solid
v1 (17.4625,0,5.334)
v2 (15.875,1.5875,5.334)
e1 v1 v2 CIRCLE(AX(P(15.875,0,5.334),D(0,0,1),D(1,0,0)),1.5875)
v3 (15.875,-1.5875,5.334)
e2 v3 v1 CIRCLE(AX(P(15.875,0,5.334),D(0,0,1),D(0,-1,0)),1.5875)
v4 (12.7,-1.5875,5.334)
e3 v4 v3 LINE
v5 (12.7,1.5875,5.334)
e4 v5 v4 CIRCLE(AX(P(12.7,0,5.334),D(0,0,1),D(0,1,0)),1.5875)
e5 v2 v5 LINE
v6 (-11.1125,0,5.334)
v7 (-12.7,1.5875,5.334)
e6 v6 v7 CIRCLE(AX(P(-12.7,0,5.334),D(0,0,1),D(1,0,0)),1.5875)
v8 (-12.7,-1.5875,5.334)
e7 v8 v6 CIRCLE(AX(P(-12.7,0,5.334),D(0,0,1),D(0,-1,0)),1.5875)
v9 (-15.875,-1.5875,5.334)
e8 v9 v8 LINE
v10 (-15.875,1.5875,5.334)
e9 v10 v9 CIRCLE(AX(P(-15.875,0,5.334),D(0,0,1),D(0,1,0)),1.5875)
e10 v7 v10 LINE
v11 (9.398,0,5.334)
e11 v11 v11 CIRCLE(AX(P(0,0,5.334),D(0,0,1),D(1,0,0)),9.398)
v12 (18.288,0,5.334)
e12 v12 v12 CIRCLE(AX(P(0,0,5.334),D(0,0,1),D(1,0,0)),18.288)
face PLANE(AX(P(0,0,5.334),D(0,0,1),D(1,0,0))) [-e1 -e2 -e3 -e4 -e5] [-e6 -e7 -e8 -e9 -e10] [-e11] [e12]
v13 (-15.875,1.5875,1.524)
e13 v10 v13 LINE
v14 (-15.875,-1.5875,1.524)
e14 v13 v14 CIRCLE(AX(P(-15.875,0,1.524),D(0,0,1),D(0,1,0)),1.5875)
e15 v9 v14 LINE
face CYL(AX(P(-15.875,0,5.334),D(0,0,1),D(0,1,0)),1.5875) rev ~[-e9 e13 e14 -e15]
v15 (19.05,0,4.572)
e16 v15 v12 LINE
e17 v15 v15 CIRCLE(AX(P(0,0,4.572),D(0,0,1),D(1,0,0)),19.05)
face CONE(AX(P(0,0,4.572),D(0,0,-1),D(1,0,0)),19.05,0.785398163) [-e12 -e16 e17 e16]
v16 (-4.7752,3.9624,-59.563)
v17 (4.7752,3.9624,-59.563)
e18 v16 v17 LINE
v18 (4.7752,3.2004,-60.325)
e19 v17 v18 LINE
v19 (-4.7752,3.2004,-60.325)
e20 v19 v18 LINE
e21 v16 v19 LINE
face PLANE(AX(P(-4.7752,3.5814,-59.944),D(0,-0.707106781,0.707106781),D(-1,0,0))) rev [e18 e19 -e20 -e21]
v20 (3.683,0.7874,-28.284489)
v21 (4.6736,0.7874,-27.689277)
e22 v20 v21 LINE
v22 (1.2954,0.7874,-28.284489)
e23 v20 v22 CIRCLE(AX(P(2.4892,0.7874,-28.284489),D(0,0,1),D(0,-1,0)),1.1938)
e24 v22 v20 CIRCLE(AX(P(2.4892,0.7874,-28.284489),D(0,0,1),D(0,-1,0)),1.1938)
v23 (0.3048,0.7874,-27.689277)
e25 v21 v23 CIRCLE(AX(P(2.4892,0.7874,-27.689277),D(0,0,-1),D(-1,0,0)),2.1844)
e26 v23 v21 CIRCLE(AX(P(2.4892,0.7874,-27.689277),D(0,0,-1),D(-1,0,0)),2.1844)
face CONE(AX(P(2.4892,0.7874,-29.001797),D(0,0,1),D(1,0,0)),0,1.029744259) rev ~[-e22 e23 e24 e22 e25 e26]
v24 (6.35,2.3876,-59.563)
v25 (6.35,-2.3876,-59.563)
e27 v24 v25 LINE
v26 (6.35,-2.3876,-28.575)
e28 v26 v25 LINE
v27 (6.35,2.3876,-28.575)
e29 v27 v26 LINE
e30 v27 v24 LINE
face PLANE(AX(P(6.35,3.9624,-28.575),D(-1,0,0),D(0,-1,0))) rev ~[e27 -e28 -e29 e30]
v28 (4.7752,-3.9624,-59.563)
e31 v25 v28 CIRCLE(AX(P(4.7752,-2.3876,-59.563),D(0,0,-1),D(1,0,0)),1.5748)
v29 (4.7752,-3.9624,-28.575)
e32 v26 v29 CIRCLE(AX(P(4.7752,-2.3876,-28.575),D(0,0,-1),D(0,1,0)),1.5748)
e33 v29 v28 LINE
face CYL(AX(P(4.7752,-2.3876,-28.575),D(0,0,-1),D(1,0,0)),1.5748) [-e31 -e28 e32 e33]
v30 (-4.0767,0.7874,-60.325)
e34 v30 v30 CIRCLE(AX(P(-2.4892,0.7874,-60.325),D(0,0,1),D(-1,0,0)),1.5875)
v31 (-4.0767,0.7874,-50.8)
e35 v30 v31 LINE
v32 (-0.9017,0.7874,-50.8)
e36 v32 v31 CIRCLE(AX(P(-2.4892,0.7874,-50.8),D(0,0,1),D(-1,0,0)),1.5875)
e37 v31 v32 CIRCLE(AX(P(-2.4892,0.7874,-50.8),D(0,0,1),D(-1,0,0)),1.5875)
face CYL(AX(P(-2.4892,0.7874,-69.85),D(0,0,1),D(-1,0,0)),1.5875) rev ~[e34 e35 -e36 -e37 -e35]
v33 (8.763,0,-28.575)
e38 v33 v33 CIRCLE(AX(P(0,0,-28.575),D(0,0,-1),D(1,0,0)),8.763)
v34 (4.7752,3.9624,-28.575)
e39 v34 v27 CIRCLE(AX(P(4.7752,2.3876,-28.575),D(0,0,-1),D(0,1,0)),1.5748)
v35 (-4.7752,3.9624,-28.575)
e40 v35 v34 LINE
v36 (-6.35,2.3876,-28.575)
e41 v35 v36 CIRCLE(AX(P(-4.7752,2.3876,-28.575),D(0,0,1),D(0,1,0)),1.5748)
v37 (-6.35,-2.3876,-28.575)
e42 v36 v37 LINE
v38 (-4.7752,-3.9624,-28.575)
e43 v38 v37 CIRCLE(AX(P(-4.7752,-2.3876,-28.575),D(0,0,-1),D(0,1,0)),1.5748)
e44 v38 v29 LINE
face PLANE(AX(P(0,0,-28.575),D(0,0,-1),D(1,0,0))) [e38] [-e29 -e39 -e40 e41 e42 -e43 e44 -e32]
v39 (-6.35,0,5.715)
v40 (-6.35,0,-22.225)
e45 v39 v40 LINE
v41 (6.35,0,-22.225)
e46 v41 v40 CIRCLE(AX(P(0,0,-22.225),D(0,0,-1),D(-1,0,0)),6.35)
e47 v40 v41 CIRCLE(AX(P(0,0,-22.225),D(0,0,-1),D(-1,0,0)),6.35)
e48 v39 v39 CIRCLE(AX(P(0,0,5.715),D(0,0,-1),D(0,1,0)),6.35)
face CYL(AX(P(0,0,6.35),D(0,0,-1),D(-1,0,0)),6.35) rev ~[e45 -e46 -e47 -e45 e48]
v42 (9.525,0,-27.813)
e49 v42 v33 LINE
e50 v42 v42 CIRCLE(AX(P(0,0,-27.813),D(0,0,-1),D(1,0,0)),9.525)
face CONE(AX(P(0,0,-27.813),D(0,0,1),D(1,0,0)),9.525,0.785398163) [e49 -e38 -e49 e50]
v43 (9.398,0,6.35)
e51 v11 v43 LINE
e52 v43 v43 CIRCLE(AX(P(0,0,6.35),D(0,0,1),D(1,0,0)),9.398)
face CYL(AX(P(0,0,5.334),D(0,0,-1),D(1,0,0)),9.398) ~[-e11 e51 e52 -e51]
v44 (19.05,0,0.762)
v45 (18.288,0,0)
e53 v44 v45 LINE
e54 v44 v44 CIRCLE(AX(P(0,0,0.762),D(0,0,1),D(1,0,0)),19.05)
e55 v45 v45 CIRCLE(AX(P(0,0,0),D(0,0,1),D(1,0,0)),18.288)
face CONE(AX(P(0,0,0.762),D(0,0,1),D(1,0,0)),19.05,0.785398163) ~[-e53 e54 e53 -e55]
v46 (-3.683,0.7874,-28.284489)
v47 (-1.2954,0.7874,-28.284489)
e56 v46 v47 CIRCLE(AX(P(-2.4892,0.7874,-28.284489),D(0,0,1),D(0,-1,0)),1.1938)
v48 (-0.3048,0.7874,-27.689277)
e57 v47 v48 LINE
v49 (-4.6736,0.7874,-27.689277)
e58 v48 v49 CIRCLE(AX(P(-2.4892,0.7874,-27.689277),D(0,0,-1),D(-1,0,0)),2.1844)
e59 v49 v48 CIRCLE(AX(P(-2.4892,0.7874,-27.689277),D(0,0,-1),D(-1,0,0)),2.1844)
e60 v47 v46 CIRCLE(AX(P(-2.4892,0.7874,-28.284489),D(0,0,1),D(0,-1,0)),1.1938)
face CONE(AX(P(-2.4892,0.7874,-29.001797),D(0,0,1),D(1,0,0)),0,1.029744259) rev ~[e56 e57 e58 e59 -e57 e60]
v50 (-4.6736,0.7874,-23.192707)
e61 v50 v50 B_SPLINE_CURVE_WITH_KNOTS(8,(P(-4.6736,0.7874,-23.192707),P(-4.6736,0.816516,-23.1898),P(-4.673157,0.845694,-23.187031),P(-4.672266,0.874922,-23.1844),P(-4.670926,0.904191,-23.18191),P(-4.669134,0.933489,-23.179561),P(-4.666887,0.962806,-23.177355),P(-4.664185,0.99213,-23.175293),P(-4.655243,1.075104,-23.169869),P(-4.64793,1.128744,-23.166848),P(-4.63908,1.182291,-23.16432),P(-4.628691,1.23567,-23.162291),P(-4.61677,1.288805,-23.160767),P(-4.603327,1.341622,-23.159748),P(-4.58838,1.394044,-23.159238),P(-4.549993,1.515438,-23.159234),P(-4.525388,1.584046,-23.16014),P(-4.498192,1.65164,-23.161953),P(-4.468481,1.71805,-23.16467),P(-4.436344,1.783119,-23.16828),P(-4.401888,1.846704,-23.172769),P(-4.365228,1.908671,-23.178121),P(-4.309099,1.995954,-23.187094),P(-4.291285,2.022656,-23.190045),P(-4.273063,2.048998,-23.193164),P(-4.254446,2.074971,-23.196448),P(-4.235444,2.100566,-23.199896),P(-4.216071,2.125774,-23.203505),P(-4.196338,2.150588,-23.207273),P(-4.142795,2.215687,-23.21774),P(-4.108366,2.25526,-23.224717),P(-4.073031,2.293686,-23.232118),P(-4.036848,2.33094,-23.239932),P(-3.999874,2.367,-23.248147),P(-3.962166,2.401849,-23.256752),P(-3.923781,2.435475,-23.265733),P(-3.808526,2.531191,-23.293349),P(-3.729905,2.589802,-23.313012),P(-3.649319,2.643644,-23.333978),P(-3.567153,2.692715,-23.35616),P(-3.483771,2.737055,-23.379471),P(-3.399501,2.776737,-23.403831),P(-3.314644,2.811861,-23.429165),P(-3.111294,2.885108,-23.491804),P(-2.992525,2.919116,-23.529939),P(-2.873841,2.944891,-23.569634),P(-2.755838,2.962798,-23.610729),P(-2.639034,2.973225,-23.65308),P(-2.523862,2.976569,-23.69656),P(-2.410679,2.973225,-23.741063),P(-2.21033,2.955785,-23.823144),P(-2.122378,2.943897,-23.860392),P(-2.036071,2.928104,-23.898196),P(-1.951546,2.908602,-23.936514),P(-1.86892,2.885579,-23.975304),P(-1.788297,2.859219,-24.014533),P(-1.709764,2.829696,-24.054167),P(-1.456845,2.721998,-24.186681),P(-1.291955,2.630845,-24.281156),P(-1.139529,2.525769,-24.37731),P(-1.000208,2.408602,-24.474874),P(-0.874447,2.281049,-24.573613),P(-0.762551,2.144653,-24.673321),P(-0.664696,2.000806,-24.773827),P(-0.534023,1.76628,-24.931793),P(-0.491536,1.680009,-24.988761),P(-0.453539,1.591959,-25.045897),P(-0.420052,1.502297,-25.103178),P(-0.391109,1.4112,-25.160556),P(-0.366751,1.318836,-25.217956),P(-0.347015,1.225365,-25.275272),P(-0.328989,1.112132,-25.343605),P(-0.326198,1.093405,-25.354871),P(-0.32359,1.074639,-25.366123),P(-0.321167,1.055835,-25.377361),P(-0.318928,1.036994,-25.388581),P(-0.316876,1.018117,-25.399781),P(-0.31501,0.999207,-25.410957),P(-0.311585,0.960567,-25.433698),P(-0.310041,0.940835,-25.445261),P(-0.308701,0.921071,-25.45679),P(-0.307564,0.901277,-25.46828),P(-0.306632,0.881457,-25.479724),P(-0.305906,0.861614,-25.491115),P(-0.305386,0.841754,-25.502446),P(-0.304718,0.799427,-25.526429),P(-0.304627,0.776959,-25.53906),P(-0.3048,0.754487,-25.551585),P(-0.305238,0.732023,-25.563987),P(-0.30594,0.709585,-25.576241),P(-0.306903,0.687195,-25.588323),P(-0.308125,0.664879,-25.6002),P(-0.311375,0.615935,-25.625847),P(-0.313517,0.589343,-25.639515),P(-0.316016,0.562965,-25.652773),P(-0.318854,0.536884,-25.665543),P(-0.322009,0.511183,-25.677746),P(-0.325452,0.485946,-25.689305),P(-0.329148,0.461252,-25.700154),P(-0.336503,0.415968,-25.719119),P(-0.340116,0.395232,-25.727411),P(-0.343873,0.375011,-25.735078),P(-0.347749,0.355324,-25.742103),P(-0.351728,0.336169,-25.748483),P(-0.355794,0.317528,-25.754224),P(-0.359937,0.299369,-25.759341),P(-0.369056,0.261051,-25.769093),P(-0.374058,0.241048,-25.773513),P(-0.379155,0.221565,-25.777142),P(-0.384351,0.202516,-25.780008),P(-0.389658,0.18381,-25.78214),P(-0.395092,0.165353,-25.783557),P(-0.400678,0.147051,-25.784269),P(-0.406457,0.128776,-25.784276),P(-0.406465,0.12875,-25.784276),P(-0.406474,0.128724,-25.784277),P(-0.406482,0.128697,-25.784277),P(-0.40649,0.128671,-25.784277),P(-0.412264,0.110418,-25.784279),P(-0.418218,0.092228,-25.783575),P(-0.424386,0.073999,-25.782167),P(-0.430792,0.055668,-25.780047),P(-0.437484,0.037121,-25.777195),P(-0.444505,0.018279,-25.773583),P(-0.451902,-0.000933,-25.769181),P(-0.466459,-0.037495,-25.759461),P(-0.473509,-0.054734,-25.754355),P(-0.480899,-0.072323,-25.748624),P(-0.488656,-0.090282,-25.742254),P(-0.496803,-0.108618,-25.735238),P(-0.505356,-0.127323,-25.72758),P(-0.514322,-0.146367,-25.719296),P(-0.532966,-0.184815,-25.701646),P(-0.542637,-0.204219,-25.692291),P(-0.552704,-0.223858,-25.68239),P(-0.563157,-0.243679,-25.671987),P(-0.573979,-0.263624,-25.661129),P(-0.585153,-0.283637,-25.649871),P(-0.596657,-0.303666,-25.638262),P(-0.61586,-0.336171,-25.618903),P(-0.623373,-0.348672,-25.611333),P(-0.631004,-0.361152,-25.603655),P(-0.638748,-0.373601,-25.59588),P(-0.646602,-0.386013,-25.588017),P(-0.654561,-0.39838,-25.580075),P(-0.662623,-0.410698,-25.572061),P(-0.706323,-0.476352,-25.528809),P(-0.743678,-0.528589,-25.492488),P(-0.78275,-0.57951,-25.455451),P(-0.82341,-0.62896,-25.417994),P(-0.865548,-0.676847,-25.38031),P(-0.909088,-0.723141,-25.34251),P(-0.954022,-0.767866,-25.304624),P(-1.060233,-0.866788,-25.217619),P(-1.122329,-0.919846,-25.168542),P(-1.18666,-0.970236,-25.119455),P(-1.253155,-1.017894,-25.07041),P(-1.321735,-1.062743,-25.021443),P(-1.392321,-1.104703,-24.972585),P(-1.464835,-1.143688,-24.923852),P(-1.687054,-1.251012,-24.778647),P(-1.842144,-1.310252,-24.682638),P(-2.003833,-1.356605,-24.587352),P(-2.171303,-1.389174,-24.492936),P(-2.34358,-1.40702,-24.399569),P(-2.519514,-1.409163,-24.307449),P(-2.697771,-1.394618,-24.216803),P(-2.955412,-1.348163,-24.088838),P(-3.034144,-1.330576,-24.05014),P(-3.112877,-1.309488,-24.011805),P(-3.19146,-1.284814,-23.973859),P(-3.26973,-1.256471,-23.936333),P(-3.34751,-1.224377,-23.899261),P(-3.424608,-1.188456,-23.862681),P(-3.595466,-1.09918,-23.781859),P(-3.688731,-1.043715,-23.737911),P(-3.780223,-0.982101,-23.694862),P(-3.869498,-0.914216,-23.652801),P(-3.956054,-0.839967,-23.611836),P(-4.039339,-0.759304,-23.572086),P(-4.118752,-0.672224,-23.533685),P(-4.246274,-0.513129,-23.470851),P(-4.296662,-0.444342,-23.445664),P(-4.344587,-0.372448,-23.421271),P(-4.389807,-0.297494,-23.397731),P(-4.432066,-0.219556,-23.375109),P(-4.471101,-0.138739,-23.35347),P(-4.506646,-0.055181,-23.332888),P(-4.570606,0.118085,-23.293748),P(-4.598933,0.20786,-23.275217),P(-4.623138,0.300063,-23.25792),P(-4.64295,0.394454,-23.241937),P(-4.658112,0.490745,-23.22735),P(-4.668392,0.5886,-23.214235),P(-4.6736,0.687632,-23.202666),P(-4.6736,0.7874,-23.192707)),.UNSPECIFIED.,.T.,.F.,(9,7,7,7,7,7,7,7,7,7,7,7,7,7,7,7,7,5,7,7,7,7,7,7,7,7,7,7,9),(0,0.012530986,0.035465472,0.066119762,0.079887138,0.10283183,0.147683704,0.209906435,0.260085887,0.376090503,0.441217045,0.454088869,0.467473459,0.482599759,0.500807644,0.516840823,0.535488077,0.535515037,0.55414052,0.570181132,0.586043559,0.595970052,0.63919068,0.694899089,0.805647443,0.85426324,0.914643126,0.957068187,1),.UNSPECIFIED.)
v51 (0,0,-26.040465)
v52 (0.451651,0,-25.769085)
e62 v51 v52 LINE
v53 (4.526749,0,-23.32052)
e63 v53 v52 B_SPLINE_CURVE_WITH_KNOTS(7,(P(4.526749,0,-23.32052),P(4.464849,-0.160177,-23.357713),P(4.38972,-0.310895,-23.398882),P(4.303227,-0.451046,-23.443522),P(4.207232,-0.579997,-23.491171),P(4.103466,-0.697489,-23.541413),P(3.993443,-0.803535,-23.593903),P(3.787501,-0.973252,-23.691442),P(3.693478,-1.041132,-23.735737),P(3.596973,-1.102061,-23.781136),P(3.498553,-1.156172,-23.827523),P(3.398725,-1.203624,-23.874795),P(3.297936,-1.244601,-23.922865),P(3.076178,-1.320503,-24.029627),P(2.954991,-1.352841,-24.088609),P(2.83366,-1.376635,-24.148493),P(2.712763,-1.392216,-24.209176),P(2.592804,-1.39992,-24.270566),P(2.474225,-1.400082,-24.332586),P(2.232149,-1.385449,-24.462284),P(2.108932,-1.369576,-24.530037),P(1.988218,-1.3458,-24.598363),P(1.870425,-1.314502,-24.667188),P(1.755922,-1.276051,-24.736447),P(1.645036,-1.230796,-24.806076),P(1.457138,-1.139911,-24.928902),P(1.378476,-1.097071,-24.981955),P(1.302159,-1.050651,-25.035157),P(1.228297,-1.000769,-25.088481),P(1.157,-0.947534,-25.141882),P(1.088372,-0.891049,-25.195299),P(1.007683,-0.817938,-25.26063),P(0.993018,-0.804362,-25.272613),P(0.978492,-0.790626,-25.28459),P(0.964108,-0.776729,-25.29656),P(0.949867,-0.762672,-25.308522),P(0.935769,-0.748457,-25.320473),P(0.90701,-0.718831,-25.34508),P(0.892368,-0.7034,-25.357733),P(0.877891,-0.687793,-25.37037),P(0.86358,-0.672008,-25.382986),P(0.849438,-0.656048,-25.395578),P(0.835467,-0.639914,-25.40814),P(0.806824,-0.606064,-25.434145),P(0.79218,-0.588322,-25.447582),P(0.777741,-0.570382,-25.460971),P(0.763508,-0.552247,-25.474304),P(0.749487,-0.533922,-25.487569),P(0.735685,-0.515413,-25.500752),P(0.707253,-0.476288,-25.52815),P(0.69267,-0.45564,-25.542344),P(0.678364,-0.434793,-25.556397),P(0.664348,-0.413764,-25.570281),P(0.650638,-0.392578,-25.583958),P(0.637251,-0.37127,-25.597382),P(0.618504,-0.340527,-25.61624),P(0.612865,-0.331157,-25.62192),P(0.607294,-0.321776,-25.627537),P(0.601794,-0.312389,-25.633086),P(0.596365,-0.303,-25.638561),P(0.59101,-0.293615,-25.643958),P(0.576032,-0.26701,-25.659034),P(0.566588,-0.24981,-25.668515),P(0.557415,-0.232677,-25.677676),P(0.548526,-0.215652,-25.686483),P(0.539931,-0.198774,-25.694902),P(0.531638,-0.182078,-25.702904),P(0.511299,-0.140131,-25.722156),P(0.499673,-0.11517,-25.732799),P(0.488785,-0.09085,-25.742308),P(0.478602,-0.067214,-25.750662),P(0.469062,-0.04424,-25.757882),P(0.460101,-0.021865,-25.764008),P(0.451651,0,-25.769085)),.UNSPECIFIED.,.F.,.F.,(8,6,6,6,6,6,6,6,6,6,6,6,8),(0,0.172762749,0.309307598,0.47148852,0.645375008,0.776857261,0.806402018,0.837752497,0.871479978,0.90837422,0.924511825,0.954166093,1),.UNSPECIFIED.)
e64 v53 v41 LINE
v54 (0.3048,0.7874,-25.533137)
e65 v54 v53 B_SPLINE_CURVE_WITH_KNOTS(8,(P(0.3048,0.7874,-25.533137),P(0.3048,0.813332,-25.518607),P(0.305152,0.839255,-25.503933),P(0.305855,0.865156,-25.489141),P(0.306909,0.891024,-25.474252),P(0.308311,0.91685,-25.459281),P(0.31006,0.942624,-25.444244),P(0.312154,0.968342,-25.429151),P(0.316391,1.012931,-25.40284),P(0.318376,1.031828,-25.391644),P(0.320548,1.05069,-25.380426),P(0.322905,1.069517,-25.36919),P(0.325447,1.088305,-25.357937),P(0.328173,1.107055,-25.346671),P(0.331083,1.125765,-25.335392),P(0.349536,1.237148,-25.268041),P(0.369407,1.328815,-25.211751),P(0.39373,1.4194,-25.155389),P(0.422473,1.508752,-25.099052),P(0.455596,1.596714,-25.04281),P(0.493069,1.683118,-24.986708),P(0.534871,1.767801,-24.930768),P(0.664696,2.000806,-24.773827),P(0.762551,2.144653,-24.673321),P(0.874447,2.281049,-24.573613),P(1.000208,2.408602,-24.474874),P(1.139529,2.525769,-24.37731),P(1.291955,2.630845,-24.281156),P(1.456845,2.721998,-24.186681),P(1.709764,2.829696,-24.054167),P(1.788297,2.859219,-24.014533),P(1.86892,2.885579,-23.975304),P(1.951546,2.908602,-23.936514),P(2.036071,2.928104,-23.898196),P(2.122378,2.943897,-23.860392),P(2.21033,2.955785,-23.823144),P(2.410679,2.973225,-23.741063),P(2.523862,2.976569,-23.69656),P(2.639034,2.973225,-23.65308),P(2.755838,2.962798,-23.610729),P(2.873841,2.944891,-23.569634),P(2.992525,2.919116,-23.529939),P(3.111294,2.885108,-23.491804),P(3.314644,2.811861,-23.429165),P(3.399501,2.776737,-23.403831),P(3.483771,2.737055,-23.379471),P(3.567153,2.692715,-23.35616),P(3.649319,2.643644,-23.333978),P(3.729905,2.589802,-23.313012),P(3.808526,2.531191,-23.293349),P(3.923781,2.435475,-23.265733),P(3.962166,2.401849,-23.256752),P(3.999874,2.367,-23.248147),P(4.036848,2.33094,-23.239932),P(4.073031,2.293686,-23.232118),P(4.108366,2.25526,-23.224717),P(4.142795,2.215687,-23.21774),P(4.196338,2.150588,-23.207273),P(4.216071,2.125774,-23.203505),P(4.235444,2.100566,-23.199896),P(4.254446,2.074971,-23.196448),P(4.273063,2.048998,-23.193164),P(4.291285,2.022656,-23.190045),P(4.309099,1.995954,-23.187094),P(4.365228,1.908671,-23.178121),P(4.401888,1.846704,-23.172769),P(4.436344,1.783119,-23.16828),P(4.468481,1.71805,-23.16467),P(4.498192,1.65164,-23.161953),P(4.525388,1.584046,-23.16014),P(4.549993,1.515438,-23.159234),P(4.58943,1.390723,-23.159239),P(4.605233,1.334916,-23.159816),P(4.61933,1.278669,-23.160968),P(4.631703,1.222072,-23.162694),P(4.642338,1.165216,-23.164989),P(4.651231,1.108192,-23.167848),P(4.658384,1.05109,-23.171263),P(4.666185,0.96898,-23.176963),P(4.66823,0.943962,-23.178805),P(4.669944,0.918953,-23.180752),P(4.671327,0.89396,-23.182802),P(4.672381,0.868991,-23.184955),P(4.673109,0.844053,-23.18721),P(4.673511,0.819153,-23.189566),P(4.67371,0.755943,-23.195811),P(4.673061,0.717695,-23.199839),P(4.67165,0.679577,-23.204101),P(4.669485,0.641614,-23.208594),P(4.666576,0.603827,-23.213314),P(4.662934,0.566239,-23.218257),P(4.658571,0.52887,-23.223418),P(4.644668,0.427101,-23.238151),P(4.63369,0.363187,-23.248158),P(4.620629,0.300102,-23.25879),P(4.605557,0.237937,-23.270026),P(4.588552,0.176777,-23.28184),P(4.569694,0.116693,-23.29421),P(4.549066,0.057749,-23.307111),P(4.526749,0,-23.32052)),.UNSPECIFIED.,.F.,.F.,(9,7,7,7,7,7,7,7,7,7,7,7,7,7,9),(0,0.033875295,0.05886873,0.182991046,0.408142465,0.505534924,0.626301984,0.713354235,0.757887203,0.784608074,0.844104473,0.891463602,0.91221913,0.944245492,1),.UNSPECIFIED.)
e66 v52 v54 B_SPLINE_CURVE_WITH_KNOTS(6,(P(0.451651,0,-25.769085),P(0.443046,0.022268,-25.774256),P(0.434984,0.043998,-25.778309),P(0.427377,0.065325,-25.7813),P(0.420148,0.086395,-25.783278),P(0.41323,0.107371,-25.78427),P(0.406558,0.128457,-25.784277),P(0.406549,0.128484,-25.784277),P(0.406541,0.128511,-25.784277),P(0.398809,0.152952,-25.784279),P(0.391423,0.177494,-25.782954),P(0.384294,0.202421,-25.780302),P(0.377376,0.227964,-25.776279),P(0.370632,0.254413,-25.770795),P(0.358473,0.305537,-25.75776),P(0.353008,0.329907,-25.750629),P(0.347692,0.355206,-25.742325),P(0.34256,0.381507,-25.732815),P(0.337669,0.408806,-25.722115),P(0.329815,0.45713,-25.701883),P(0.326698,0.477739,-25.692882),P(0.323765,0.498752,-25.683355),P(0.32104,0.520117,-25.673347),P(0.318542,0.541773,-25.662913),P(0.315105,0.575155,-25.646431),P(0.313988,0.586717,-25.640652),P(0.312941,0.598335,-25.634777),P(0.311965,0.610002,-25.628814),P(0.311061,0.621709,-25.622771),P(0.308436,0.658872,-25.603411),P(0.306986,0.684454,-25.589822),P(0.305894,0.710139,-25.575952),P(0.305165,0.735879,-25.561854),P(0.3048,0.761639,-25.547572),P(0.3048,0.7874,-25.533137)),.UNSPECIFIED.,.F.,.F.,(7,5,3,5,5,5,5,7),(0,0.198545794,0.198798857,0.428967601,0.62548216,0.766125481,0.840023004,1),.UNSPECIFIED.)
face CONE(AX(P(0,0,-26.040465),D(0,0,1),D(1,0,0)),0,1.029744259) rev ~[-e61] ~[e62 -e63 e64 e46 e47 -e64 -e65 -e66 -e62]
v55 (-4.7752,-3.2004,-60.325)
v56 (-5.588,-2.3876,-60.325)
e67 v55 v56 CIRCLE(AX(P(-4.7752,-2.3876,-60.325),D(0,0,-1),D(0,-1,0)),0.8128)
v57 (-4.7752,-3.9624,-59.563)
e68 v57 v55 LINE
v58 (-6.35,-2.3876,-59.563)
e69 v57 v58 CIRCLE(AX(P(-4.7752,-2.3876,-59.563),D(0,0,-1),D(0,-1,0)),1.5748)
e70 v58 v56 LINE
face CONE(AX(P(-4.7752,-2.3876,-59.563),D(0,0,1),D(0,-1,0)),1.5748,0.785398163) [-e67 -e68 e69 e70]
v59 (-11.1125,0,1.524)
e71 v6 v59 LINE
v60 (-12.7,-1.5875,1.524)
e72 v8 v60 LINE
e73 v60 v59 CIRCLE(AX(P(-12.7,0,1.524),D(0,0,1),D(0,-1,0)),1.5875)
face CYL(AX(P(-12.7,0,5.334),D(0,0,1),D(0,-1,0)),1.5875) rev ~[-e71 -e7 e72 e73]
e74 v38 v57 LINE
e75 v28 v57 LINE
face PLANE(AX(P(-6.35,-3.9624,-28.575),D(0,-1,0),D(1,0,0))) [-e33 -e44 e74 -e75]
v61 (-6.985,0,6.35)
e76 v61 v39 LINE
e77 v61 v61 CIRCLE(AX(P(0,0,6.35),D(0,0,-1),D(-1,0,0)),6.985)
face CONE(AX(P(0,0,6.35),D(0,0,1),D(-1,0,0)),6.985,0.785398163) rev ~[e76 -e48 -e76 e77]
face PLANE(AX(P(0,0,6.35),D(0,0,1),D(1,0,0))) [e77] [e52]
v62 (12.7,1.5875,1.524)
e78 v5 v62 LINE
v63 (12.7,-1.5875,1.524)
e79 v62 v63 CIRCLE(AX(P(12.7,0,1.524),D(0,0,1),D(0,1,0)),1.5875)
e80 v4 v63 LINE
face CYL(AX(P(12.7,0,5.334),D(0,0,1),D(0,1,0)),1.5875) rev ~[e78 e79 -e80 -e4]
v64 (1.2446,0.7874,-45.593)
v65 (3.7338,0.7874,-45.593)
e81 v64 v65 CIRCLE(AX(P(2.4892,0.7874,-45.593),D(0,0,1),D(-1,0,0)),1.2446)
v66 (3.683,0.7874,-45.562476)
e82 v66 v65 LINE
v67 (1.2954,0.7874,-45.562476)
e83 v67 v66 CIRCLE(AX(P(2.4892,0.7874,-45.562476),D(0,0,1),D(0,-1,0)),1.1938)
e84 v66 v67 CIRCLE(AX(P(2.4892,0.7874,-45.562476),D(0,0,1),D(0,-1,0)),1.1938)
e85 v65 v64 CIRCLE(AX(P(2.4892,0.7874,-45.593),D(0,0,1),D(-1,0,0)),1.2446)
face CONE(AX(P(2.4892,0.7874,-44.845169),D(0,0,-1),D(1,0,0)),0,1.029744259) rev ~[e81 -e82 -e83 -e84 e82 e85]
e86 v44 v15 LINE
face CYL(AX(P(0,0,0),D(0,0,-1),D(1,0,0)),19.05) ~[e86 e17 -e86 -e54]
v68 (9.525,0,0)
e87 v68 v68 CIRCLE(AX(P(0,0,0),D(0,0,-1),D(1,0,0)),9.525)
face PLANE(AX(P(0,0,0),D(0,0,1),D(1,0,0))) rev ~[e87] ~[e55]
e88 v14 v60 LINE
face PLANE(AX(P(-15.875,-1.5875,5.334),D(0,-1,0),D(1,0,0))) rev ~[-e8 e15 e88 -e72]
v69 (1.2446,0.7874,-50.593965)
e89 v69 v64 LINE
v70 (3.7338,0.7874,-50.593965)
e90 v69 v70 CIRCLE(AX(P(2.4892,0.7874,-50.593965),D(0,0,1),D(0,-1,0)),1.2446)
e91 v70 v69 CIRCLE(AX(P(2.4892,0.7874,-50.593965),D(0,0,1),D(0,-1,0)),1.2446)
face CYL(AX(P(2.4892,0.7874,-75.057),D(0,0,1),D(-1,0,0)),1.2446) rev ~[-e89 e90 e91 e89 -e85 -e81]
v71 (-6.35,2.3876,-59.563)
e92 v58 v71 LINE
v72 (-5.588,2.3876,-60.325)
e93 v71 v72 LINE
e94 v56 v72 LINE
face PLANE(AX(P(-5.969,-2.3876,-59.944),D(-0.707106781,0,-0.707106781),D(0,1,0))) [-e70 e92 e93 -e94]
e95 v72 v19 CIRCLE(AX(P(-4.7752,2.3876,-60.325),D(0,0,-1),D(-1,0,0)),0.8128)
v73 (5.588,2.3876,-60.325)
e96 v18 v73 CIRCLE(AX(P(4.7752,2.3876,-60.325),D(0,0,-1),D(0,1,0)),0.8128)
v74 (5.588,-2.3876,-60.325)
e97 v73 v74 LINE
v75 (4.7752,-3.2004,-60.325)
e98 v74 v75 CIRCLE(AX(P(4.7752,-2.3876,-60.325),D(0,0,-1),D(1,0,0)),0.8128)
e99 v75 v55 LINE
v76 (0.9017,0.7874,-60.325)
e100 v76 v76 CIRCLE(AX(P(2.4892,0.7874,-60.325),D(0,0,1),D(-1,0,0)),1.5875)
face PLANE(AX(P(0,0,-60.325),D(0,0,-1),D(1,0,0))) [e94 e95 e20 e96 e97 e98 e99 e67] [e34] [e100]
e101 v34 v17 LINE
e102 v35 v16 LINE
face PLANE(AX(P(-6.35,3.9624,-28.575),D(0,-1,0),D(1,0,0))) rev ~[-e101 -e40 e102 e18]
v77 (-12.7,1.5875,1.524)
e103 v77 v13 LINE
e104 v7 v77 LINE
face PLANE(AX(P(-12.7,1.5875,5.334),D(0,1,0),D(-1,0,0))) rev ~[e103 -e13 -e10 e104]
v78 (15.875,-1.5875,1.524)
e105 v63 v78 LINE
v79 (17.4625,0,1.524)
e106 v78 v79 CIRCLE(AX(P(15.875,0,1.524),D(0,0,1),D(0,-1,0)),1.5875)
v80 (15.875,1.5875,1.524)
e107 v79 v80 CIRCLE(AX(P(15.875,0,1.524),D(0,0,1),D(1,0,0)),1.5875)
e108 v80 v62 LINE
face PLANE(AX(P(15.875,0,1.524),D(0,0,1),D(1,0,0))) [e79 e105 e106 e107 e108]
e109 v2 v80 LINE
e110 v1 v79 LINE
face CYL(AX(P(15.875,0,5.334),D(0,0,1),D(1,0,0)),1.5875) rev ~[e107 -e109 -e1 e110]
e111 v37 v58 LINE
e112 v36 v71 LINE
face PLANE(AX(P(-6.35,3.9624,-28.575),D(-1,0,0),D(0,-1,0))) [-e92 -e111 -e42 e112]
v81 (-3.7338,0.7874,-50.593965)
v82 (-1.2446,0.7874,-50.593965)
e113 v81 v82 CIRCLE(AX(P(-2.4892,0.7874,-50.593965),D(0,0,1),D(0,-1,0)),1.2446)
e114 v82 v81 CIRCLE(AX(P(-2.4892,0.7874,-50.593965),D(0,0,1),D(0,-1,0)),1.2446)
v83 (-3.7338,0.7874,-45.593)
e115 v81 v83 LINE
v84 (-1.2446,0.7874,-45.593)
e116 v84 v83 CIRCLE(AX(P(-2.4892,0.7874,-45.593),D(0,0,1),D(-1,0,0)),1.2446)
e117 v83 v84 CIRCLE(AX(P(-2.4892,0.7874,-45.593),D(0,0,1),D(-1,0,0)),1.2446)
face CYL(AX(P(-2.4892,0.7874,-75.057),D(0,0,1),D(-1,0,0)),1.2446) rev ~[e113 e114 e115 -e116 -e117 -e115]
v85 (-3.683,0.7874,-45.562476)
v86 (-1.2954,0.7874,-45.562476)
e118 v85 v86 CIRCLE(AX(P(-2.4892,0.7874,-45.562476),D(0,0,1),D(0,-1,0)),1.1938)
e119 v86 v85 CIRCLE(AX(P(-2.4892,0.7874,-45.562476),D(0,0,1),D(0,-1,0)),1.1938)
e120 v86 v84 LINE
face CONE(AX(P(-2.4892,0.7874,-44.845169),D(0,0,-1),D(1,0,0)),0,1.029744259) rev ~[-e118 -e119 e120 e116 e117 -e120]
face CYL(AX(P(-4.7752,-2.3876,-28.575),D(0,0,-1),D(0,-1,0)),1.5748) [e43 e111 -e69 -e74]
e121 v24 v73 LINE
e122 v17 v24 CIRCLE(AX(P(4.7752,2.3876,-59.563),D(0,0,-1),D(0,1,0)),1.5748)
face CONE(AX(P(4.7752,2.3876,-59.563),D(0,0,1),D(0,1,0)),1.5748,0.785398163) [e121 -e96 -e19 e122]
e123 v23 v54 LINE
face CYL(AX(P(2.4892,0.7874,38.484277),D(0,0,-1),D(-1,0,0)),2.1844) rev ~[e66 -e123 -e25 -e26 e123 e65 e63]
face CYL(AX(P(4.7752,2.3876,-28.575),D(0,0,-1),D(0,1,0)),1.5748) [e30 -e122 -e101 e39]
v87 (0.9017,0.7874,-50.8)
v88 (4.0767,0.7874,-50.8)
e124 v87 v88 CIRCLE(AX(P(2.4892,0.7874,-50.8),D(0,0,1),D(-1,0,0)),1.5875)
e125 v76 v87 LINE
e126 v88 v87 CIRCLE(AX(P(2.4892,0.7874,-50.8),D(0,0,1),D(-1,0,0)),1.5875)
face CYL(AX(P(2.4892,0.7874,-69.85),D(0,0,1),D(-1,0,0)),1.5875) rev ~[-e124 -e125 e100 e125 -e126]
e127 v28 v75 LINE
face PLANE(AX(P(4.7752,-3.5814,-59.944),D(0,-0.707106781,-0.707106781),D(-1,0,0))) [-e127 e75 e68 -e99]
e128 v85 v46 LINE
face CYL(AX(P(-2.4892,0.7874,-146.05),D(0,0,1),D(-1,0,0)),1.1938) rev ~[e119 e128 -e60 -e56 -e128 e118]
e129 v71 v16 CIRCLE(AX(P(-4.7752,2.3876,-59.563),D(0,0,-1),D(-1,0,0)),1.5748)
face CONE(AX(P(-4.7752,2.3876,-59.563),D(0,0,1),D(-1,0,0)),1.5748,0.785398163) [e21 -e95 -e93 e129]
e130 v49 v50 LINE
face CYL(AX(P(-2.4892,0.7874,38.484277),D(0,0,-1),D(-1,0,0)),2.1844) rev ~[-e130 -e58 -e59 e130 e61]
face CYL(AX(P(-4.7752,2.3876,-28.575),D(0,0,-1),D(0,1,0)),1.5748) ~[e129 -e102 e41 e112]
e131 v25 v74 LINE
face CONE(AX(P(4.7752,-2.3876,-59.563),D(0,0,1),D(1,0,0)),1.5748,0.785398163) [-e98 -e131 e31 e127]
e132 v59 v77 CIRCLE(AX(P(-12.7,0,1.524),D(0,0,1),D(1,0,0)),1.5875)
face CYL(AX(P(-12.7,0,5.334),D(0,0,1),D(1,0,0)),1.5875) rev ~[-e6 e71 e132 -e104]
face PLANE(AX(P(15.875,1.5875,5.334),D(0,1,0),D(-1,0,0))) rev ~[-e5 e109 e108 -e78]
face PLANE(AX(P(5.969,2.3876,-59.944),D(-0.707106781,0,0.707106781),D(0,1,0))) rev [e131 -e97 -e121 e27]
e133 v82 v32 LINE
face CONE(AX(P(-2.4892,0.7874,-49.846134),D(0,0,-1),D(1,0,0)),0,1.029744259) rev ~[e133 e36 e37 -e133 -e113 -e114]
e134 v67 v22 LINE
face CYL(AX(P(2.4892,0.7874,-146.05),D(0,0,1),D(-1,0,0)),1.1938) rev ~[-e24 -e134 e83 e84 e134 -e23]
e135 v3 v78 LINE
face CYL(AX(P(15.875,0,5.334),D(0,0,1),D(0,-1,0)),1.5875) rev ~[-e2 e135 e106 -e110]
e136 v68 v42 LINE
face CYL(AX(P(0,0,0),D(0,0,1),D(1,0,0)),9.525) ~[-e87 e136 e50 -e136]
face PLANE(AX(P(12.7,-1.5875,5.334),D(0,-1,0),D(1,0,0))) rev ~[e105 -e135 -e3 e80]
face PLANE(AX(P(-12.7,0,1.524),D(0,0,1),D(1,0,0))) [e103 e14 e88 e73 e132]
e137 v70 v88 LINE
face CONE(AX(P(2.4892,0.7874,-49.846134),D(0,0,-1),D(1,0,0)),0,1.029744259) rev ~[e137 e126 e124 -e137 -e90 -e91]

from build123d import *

# Parameters (mm, degrees)
F0_R           = 19.05
F1_DEPTH       = 5.334
F2_R           = 9.398
F3_DEPTH       = 1.016
F4_R           = 9.525
F5_DEPTH       = 28.575
F6_W           = 12.7
F6_H           = 7.9248
F7_DEPTH       = 31.75
F9_D           = 12.7
F9_DEPTH       = 28.575
F9_CSINK_D     = 13.97
F9_CSINK_ANGLE = 90
F9_TIP         = 3.8154649308
F10_SIZE       = 0.762
F12_D          = 2.3876
F14_D          = 2.4892
F14_DEPTH      = 14.732
F14_TIP        = 0.7478311264
F16_D          = 3.175
F16_DEPTH      = 9.525
F16_TIP        = 0.9538662327
F18_D          = 4.3688
F18_DEPTH      = 1.905
F18_START      = 32.1342766
F18_TIP        = 1.3125199362
F20_DEPTH      = 3.81
F21_R          = 1.5748
F22_SIZE       = 0.762


# Not quite as in the source:
# - a length typed as a fraction of an inch, garbled in the dataset ("3 / 203.2 mm" for 3/8 in), is restored


with BuildPart() as f1:
    # F0 (on Top) → F1 (new body)
    with BuildSketch(Plane.XY):
        Circle(F0_R)
    extrude(amount=F1_DEPTH)

    # F2 (on face) → F3 (join)
    with BuildSketch(Plane.XY.offset(5.334)):
        Circle(F2_R)
    extrude(amount=F3_DEPTH)

    # F4 (on face) → F5 (join)
    with BuildSketch(Plane(origin=(0, 0, 0), x_dir=(1, 0, 0), z_dir=(0, 0, -1))):
        Circle(F4_R)
    extrude(amount=F5_DEPTH)

    # F6 (on face) → F7 (join)
    with BuildSketch(Plane(origin=(0, 0, -28.575), x_dir=(1, 0, 0), z_dir=(0, 0, -1))):
        Rectangle(F6_W, F6_H)
    extrude(amount=F7_DEPTH)

    # F9
    with Locations(Plane.XY.offset(6.35)):
        with Locations((0, 0)):
            CounterSinkHole(F9_D / 2, F9_CSINK_D / 2, depth=F9_DEPTH, counter_sink_angle=F9_CSINK_ANGLE)
            with Locations((0, 0, -(F9_DEPTH + F9_TIP / 2))):  # 118° drill point
                Cone(0, F9_D / 2, F9_TIP, mode=Mode.SUBTRACT)

    # F10
    f10_edges = [f1.edges().sort_by_distance(p)[0] for p in [
        (-9.525, 0, -28.575),
        (-19.05, 0, 0),
        (-19.05, 0, 5.334),
    ]]
    chamfer(f10_edges, length=F10_SIZE)

    # F12 (through all)
    with Locations(Plane(origin=(0, 0, -60.325), x_dir=(1, 0, 0), z_dir=(0, 0, -1))):
        with Locations((2.4892, -0.7874), (-2.4892, -0.7874)):
            Hole(F12_D / 2)

    # F14
    with Locations(Plane(origin=(0, 0, -60.325), x_dir=(1, 0, 0), z_dir=(0, 0, -1))):
        with Locations((2.4892, -0.7874), (-2.4892, -0.7874)):
            Hole(F14_D / 2, depth=F14_DEPTH)
            with Locations((0, 0, -(F14_DEPTH + F14_TIP / 2))):  # 118° drill point
                Cone(0, F14_D / 2, F14_TIP, mode=Mode.SUBTRACT)

    # F16
    with Locations(Plane(origin=(0, 0, -60.325), x_dir=(1, 0, 0), z_dir=(0, 0, -1))):
        with Locations((2.4892, -0.7874), (-2.4892, -0.7874)):
            Hole(F16_D / 2, depth=F16_DEPTH)
            with Locations((0, 0, -(F16_DEPTH + F16_TIP / 2))):  # 118° drill point
                Cone(0, F16_D / 2, F16_TIP, mode=Mode.SUBTRACT)

    # F18
    # its depths count from where the whole tool has entered the part; down to there all is cleared
    with Locations(Plane.XY.offset(6.35)):
        with Locations((2.4892, 0.7874), (-2.4892, 0.7874)):
            Hole(F18_D / 2, depth=F18_START)
    with Locations(Plane.XY.offset(6.35).offset(-F18_START)):
        with Locations((2.4892, 0.7874), (-2.4892, 0.7874)):
            Hole(F18_D / 2, depth=F18_DEPTH)
            with Locations((0, 0, -(F18_DEPTH + F18_TIP / 2))):  # 118° drill point
                Cone(0, F18_D / 2, F18_TIP, mode=Mode.SUBTRACT)

    # F19 (on face) → F20 (cut)
    with BuildSketch(Plane.XY.offset(5.334)):
        with BuildLine():
            ThreePointArc((15.875, 1.5875), (14.7524679849, 1.1225320151), (14.2875, 0))
            ThreePointArc((14.2875, 0), (14.7524679849, -1.1225320151), (15.875, -1.5875))
            ThreePointArc((15.875, -1.5875), (16.9975320151, -1.1225320151), (17.4625, 0))
            ThreePointArc((17.4625, 0), (16.9975320151, 1.1225320151), (15.875, 1.5875))
        make_face()
        with BuildLine():
            ThreePointArc((12.7, -1.5875), (13.8225320151, -1.1225320151), (14.2875, 0))
            ThreePointArc((14.2875, 0), (13.8225320151, 1.1225320151), (12.7, 1.5875))
            Line((12.7, 1.5875), (12.7, -1.5875))
        make_face()
        with BuildLine():
            ThreePointArc((12.7, 1.5875), (13.8225320151, 1.1225320151), (14.2875, 0))
            ThreePointArc((14.2875, 0), (14.7524679849, 1.1225320151), (15.875, 1.5875))
            Line((15.875, 1.5875), (12.7, 1.5875))
        make_face()
        with BuildLine():
            Line((12.7, -1.5875), (12.7, 1.5875))
            ThreePointArc((12.7, 1.5875), (11.1125, 0), (12.7, -1.5875))
        make_face()
        with BuildLine():
            ThreePointArc((15.875, -1.5875), (14.7524679849, -1.1225320151), (14.2875, 0))
            ThreePointArc((14.2875, 0), (13.8225320151, -1.1225320151), (12.7, -1.5875))
            Line((12.7, -1.5875), (15.875, -1.5875))
        make_face()
        with BuildLine():
            ThreePointArc((-12.7, -1.5875), (-11.5774679849, -1.1225320151), (-11.1125, 0))
            ThreePointArc((-11.1125, 0), (-11.5774679849, 1.1225320151), (-12.7, 1.5875))
            ThreePointArc((-12.7, 1.5875), (-13.8225320151, 1.1225320151), (-14.2875, 0))
            ThreePointArc((-14.2875, 0), (-13.8225320151, -1.1225320151), (-12.7, -1.5875))
        make_face()
        with BuildLine():
            Line((-15.875, -1.5875), (-12.7, -1.5875))
            ThreePointArc((-12.7, -1.5875), (-13.8225320151, -1.1225320151), (-14.2875, 0))
            ThreePointArc((-14.2875, 0), (-14.7524679849, -1.1225320151), (-15.875, -1.5875))
        make_face()
        with BuildLine():
            ThreePointArc((-14.2875, 0), (-13.8225320151, 1.1225320151), (-12.7, 1.5875))
            Line((-12.7, 1.5875), (-15.875, 1.5875))
            ThreePointArc((-15.875, 1.5875), (-14.7524679849, 1.1225320151), (-14.2875, 0))
        make_face()
        with BuildLine():
            ThreePointArc((-15.875, -1.5875), (-14.7524679849, -1.1225320151), (-14.2875, 0))
            ThreePointArc((-14.2875, 0), (-14.7524679849, 1.1225320151), (-15.875, 1.5875))
            ThreePointArc((-15.875, 1.5875), (-17.4625, 0), (-15.875, -1.5875))
        make_face()
    extrude(amount=-F20_DEPTH, mode=Mode.SUBTRACT)

    # F21
    f21_edges = [f1.edges().sort_by_distance(p)[0] for p in [
        (6.35, 3.9624, -44.45),
        (6.35, -3.9624, -44.45),
        (-6.35, -3.9624, -44.45),
        (-6.35, 3.9624, -44.45),
    ]]
    fillet(f21_edges, radius=F21_R)

    # F22
    f22_edges = [f1.edges().sort_by_distance(p)[0] for p in [
        (6.35, 0, -60.325),
        (5.888752, -3.501152, -60.325),
        (0, -3.9624, -60.325),
        (-6.35, 0, -60.325),
        (-5.888752, -3.501152, -60.325),
        (0, 3.9624, -60.325),
        (5.888752, 3.501152, -60.325),
    ]]
    chamfer(f22_edges, length=F22_SIZE)


solid = f1.part
